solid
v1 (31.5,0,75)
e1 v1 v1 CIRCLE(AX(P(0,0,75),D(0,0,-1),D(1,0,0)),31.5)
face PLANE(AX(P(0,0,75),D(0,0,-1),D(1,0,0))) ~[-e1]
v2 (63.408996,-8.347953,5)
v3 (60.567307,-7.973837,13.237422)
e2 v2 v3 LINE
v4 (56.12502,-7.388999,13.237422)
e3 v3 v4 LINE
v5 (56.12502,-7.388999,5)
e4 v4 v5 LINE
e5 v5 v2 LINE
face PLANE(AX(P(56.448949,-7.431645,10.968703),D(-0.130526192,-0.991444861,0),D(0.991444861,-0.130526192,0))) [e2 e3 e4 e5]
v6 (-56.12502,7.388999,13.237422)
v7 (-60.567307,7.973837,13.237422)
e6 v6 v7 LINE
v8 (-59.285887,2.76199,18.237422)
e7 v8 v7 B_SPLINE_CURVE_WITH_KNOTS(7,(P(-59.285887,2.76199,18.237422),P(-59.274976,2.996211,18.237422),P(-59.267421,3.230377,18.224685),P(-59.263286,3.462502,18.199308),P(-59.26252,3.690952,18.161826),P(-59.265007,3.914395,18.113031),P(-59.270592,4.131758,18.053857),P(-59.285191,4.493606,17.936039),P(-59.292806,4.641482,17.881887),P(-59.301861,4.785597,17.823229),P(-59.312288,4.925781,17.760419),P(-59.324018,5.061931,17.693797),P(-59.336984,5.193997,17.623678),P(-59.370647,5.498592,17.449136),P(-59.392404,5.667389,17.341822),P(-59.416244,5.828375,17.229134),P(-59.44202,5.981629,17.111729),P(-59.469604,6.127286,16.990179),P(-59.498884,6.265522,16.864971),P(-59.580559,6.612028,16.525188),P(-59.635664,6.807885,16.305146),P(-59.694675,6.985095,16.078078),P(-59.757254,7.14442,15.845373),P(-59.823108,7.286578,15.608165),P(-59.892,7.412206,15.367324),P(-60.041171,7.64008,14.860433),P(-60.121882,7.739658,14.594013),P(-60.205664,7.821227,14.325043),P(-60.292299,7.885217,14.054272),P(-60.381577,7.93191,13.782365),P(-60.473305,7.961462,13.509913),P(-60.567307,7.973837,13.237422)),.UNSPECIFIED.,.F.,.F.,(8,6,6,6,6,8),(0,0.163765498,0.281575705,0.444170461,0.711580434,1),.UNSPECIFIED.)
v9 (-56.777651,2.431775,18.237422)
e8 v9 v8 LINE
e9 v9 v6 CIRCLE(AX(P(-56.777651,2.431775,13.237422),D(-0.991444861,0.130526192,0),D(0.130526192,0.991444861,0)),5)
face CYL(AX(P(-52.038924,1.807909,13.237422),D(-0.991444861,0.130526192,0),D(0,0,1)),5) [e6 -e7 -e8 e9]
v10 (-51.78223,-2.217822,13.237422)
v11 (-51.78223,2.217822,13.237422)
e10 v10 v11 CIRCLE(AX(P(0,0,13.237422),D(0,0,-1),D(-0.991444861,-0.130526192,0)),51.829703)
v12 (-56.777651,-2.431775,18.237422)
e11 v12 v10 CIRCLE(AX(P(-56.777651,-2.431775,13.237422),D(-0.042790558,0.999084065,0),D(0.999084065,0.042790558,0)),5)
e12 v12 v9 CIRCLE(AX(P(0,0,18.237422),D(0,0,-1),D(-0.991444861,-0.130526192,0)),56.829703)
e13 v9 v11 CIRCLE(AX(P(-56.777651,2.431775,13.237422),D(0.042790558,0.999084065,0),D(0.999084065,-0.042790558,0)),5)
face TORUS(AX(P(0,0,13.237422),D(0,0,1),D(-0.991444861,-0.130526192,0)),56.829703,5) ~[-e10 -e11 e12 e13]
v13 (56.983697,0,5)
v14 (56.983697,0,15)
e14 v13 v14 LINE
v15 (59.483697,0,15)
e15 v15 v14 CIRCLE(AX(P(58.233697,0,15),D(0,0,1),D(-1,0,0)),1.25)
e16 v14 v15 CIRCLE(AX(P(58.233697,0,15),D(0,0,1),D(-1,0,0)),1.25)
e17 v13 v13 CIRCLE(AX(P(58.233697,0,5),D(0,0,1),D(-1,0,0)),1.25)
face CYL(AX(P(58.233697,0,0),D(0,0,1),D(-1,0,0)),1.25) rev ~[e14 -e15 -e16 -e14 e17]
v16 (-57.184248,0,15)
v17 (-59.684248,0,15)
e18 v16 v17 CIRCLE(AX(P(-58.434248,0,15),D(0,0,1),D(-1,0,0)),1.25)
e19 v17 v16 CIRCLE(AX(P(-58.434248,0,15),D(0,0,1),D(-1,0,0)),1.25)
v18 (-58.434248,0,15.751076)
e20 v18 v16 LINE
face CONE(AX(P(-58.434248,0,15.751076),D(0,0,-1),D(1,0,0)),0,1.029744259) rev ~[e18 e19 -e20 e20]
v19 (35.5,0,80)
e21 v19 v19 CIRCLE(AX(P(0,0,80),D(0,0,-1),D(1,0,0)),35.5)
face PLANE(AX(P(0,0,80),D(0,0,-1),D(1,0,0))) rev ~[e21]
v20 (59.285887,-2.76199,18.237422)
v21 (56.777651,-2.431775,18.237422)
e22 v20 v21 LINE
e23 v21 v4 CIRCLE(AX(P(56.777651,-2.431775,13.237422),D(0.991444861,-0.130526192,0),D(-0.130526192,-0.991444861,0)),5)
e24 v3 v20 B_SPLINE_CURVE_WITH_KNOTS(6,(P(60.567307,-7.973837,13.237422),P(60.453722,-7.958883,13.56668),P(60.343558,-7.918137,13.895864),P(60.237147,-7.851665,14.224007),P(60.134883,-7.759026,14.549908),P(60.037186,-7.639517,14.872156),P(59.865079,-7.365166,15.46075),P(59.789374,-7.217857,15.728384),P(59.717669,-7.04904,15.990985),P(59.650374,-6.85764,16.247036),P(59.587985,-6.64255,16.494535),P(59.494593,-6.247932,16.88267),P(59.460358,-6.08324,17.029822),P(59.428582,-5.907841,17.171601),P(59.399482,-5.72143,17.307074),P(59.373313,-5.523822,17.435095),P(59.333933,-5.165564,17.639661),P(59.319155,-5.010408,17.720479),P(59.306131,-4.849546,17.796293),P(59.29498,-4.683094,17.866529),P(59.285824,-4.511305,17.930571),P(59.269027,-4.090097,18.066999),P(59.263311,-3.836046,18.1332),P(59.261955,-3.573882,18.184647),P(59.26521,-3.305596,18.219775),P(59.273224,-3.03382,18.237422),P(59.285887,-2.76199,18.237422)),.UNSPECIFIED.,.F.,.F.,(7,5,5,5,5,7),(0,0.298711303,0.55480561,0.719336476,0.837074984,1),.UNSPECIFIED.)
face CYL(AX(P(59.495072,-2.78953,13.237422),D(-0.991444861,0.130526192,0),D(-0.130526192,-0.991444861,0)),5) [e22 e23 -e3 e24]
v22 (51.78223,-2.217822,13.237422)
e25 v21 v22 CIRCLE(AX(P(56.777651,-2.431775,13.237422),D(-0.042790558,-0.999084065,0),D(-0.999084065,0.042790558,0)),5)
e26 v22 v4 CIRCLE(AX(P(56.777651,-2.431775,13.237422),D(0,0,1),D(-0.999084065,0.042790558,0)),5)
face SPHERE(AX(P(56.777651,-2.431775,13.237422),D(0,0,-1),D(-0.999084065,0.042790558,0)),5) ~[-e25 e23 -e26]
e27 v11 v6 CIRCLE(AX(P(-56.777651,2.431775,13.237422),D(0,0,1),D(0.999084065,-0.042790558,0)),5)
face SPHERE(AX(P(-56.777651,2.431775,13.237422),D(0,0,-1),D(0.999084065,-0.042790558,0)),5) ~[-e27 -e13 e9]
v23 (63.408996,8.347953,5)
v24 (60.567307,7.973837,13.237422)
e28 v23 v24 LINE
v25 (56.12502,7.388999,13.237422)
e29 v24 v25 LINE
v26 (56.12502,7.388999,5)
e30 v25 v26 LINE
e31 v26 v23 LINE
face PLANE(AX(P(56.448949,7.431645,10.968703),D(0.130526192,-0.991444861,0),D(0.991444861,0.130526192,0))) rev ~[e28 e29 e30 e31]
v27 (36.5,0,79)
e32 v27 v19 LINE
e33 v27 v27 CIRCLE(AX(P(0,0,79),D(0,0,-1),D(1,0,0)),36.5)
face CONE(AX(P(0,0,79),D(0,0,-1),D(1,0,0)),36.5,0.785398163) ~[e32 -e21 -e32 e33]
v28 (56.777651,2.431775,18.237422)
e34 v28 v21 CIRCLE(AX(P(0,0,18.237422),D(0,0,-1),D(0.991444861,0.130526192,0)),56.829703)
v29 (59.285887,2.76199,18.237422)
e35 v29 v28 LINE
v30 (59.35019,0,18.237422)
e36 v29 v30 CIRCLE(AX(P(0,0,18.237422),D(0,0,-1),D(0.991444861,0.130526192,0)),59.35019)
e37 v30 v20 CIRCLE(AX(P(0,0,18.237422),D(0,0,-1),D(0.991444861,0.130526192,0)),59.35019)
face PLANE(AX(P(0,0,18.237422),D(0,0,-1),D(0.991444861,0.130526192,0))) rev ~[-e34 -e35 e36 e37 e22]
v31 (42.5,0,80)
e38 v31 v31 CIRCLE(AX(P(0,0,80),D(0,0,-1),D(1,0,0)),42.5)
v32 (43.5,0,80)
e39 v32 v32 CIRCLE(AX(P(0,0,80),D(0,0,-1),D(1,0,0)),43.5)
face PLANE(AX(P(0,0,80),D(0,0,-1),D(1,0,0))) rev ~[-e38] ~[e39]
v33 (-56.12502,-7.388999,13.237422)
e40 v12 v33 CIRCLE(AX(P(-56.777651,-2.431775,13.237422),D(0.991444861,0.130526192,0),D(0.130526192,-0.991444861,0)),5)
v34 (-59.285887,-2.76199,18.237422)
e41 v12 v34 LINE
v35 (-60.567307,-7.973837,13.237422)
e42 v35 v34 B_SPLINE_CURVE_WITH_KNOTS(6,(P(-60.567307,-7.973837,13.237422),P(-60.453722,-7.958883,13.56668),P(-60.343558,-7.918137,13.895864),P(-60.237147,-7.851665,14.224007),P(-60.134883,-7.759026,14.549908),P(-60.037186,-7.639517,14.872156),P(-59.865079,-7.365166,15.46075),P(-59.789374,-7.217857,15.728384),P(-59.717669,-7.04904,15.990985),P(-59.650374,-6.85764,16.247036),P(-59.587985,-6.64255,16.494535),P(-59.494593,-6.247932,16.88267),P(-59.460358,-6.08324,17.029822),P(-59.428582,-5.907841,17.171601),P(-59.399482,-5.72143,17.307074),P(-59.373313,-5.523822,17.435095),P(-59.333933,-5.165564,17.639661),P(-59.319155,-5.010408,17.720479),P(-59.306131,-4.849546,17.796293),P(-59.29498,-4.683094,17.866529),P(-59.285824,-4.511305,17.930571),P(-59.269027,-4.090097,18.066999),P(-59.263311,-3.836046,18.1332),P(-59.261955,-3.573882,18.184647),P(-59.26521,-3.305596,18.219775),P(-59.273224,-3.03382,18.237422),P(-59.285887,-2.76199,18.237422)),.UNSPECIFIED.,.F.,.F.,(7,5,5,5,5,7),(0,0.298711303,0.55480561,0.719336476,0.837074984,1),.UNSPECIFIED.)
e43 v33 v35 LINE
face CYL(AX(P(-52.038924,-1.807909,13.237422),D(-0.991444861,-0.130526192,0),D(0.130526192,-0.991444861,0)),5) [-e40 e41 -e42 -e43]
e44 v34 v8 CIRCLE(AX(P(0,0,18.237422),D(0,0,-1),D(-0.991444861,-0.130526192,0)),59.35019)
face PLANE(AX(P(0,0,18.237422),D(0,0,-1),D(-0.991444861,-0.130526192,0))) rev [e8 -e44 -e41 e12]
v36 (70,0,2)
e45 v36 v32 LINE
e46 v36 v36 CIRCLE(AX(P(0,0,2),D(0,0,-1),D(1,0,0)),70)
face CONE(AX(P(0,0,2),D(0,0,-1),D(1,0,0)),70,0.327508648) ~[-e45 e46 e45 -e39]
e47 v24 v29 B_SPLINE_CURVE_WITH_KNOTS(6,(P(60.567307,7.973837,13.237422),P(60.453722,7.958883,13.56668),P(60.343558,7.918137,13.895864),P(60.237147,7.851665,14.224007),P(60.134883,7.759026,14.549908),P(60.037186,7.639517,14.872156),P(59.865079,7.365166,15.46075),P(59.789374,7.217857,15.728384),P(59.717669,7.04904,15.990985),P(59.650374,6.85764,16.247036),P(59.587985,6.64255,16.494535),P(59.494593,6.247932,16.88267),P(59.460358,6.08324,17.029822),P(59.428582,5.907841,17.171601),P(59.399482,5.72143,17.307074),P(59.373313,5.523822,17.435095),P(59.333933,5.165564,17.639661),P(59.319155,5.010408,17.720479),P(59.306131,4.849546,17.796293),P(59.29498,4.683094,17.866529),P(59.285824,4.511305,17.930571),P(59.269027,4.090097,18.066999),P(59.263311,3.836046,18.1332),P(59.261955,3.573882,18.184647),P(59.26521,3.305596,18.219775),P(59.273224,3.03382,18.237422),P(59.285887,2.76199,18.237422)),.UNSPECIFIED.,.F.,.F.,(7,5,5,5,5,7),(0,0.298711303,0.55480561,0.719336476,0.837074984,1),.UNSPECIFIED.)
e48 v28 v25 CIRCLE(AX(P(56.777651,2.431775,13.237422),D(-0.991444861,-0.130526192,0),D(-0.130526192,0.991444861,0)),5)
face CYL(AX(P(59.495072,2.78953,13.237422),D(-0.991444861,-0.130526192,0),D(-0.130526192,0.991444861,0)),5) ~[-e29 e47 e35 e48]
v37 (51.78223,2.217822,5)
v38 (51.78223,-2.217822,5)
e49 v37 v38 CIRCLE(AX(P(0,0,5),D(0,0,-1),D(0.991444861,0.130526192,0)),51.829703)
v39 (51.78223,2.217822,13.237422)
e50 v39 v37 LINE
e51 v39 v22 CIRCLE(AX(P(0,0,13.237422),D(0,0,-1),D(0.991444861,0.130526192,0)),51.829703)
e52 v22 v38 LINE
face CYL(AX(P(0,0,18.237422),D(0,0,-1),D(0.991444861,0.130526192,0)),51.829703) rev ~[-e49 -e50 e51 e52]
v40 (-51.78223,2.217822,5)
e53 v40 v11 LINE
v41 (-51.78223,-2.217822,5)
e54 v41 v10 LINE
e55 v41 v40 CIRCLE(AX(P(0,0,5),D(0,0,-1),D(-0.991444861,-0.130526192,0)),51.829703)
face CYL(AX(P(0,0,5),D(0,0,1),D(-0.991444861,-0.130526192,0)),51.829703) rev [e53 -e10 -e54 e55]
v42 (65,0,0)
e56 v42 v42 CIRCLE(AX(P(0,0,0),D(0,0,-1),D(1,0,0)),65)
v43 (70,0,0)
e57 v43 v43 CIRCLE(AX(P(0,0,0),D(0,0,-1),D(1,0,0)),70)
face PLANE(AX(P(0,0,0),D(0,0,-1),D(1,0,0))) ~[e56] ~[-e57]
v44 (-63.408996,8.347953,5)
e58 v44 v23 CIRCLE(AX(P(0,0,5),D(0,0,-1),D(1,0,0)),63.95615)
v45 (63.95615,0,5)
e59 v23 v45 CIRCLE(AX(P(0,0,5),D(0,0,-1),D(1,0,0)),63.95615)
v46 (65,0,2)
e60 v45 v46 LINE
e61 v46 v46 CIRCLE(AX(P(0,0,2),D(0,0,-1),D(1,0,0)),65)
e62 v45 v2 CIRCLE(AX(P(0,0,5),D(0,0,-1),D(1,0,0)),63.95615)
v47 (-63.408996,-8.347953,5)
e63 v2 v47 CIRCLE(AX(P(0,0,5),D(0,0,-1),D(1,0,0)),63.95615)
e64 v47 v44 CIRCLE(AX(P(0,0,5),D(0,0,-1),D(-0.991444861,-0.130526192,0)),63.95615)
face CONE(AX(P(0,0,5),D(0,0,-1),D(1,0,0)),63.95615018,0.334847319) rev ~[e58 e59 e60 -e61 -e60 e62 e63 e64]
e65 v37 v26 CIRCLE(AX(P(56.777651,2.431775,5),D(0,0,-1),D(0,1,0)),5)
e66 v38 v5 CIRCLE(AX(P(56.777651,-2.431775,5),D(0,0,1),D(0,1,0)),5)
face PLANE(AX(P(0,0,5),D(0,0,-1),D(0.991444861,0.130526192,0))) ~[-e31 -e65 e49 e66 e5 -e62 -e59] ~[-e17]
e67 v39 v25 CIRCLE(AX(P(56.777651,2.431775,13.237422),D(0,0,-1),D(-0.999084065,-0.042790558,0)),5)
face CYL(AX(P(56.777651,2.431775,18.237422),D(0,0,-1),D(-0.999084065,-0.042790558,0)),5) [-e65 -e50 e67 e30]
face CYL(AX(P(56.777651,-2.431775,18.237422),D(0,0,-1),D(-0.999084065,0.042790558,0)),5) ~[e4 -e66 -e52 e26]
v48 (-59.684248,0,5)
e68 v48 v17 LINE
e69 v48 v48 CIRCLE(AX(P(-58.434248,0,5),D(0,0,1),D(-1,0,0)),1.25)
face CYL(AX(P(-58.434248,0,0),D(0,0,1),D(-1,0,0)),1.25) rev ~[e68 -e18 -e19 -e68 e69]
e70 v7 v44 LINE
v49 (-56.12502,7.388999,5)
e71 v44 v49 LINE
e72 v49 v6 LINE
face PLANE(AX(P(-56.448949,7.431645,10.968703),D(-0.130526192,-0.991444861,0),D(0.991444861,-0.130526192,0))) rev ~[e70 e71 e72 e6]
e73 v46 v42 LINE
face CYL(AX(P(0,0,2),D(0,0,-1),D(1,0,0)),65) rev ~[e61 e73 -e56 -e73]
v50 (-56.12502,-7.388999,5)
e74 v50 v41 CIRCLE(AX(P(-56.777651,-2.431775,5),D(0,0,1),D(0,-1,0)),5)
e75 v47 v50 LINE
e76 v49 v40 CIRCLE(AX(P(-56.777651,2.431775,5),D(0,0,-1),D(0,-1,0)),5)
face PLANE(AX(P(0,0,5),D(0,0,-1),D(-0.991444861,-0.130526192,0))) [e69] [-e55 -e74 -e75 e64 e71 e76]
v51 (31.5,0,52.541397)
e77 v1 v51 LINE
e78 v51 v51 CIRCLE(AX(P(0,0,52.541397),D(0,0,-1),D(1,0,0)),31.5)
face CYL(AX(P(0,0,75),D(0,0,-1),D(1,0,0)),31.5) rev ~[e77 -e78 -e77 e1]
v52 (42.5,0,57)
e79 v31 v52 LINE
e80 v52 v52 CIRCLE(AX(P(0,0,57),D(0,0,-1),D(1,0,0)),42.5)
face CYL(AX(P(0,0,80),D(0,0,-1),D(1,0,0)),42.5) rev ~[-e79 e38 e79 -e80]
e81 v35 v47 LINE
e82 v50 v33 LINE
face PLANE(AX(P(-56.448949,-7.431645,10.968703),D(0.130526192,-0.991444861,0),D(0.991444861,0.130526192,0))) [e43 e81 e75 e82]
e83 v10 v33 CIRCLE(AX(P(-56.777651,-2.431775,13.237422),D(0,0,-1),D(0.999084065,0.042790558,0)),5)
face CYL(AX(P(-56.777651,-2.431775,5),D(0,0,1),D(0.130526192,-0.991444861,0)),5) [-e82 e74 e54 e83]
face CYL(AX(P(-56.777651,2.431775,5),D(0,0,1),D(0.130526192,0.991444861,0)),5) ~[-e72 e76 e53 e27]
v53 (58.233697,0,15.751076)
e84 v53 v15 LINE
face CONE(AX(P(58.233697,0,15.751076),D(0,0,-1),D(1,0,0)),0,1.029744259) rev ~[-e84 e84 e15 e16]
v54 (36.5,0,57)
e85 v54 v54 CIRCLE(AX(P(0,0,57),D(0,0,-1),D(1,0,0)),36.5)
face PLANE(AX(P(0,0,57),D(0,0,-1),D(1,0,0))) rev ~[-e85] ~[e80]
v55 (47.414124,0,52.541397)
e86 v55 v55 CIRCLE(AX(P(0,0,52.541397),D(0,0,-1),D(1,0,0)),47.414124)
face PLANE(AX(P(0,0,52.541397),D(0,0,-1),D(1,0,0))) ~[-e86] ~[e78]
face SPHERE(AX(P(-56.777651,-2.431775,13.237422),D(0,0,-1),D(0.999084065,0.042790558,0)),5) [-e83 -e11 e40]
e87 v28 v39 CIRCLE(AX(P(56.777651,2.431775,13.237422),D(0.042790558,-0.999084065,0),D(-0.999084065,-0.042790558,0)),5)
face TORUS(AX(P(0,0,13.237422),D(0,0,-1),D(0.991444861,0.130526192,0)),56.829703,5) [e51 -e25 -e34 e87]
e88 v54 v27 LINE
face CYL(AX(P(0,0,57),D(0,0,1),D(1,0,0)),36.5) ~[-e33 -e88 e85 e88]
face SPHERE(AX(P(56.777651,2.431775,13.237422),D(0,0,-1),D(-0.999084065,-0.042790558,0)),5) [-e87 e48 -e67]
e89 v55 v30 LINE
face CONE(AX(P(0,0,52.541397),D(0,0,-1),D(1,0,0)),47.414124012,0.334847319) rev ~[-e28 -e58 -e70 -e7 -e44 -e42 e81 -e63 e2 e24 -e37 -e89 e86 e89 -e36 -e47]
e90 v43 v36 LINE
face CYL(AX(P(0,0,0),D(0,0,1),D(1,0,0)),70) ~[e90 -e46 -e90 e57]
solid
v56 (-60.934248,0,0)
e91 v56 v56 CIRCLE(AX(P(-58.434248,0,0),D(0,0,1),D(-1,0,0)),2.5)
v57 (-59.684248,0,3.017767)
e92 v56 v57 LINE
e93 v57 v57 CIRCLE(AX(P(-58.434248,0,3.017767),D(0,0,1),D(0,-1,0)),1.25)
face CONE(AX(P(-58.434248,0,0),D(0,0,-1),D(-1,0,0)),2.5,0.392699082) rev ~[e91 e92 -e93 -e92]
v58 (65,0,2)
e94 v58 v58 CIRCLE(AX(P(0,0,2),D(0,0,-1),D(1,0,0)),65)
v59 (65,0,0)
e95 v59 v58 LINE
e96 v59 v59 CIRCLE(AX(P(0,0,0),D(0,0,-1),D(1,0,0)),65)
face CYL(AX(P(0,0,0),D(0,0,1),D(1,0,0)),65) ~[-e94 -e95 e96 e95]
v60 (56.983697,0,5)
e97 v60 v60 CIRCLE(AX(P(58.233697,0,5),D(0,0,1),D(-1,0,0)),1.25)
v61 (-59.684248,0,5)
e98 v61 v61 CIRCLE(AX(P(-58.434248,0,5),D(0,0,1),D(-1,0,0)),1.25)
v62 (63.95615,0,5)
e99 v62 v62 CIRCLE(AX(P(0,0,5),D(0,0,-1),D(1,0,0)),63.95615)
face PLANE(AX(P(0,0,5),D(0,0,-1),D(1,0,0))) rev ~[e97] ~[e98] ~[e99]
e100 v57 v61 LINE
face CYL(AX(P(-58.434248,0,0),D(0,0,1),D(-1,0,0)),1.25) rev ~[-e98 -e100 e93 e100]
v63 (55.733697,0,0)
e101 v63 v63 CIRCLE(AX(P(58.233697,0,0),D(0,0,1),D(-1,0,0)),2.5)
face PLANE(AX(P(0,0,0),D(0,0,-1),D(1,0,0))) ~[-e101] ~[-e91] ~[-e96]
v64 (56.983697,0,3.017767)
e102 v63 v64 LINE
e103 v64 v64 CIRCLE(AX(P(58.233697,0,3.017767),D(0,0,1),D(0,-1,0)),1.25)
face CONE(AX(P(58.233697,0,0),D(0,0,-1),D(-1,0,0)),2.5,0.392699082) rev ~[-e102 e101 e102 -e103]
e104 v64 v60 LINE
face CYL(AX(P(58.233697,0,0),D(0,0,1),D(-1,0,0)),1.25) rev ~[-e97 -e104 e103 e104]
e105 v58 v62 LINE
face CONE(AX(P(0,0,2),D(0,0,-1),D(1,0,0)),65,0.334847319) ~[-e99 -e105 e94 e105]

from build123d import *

# Parameters (mm, degrees)
F2_SIZE          = 1
F4_ANGLE_BACK    = 7.5
F4_ANGLE         = 15
F5_ANGLE_BACK    = 7.5
F5_ANGLE         = 15
F7_D             = 2.5
F7_DEPTH         = 15
F7_CSINK_D       = 5
F7_CSINK_ANGLE   = 45
F7_TIP           = 0.7510757738
F7_2_D           = 2.5
F7_2_DEPTH       = 15
F7_2_CSINK_D     = 5
F7_2_CSINK_ANGLE = 45
F7_2_TIP         = 0.7510757738
F8_R             = 5


with BuildPart() as f1:
    # F0 (on Front) → F1 (revolve)
    with BuildSketch(Plane.XZ):
        Polygon((70, 2), (43.5, 80), (42.5, 80), (42.5, 57), (36.5, 57), (36.5, 80), (31.5, 80), (0, 80), (0, 75), (31.5, 75), (31.5, 57), (31.5, 52.5413967947), (47.414124012, 52.5413967947), (59.3501898877, 18.2374222869), (63.9561501797, 5), (65, 2), (65, 0), (70, 0), align=None)
    revolve(axis=Axis((0, 0, 40), (0, 0, -1)))

    # F2
    f2_edges = [f1.edges().sort_by_distance(p)[0] for p in [
        (-36.5, 0, 80),
    ]]
    chamfer(f2_edges, length=F2_SIZE)

    # F0 (on Front) → F4 (revolve)
    with BuildSketch(Plane.XZ, mode=Mode.PRIVATE) as f4_sk:
        Polygon((51.8297031522, 5), (63.9561501797, 5), (59.3501898877, 18.2374222869), (51.8297031522, 18.2374222869), align=None)
    revolve(f4_sk.sketch.rotate(Axis((0, 0, 40), (0, 0, -1)), -F4_ANGLE_BACK), axis=Axis((0, 0, 40), (0, 0, -1)), revolution_arc=F4_ANGLE)

    # F0 (on Front) → F5 (revolve)
    with BuildSketch(Plane.XZ, mode=Mode.PRIVATE) as f5_sk:
        Polygon((-63.9561501797, 5), (-51.8297031522, 5), (-51.8297031522, 18.2374222869), (-59.3501898877, 18.2374222869), align=None)
    revolve(f5_sk.sketch.rotate(Axis((0, 0, 40), (0, 0, -1)), -F5_ANGLE_BACK), axis=Axis((0, 0, 40), (0, 0, -1)), revolution_arc=F5_ANGLE)

    # F7
    with Locations(Plane(origin=(0, 0, 0), x_dir=(1, 0, 0), z_dir=(0, 0, -1))):
        with Locations((58.2336969674, 0), (-58.4342479706, 0)):
            CounterSinkHole(F7_D / 2, F7_CSINK_D / 2, depth=F7_DEPTH, counter_sink_angle=F7_CSINK_ANGLE)
            with Locations((0, 0, -(F7_DEPTH + F7_TIP / 2))):  # 118° drill point
                Cone(0, F7_D / 2, F7_TIP, mode=Mode.SUBTRACT)

    # F8
    f8_edges = [f1.edges().sort_by_distance(p)[0] for p in [
        (-51.386293, -6.765134, 11.618711),
        (-51.386293, 6.765134, 11.618711),
        (51.386293, -6.765134, 11.618711),
        (51.386293, 6.765134, 11.618711),
        (-51.829703, 0, 18.237422),
        (51.829703, 0, 18.237422),
        (55.114367, 7.255944, 18.237422),
        (55.114367, -7.255944, 18.237422),
        (-55.114367, -7.255944, 18.237422),
        (-55.114367, 7.255944, 18.237422),
    ]]
    fillet(f8_edges, radius=F8_R)


with BuildPart() as f3:
    # F0 (on Front) → F3 (revolve)
    with BuildSketch(Plane.XZ):
        Polygon((0, 0), (65, 0), (65, 2), (63.9561501797, 5), (51.8297031522, 5), (0, 5), align=None)
    revolve(axis=Axis((0, 0, 40), (0, 0, -1)))

    # F7#2
    with Locations(Plane(origin=(0, 0, 0), x_dir=(1, 0, 0), z_dir=(0, 0, -1))):
        with Locations((58.2336969674, 0), (-58.4342479706, 0)):
            CounterSinkHole(F7_2_D / 2, F7_2_CSINK_D / 2, depth=F7_2_DEPTH, counter_sink_angle=F7_2_CSINK_ANGLE)
            with Locations((0, 0, -(F7_2_DEPTH + F7_2_TIP / 2))):  # 118° drill point
                Cone(0, F7_2_D / 2, F7_2_TIP, mode=Mode.SUBTRACT)


solid = Compound([f1.part, f3.part])
